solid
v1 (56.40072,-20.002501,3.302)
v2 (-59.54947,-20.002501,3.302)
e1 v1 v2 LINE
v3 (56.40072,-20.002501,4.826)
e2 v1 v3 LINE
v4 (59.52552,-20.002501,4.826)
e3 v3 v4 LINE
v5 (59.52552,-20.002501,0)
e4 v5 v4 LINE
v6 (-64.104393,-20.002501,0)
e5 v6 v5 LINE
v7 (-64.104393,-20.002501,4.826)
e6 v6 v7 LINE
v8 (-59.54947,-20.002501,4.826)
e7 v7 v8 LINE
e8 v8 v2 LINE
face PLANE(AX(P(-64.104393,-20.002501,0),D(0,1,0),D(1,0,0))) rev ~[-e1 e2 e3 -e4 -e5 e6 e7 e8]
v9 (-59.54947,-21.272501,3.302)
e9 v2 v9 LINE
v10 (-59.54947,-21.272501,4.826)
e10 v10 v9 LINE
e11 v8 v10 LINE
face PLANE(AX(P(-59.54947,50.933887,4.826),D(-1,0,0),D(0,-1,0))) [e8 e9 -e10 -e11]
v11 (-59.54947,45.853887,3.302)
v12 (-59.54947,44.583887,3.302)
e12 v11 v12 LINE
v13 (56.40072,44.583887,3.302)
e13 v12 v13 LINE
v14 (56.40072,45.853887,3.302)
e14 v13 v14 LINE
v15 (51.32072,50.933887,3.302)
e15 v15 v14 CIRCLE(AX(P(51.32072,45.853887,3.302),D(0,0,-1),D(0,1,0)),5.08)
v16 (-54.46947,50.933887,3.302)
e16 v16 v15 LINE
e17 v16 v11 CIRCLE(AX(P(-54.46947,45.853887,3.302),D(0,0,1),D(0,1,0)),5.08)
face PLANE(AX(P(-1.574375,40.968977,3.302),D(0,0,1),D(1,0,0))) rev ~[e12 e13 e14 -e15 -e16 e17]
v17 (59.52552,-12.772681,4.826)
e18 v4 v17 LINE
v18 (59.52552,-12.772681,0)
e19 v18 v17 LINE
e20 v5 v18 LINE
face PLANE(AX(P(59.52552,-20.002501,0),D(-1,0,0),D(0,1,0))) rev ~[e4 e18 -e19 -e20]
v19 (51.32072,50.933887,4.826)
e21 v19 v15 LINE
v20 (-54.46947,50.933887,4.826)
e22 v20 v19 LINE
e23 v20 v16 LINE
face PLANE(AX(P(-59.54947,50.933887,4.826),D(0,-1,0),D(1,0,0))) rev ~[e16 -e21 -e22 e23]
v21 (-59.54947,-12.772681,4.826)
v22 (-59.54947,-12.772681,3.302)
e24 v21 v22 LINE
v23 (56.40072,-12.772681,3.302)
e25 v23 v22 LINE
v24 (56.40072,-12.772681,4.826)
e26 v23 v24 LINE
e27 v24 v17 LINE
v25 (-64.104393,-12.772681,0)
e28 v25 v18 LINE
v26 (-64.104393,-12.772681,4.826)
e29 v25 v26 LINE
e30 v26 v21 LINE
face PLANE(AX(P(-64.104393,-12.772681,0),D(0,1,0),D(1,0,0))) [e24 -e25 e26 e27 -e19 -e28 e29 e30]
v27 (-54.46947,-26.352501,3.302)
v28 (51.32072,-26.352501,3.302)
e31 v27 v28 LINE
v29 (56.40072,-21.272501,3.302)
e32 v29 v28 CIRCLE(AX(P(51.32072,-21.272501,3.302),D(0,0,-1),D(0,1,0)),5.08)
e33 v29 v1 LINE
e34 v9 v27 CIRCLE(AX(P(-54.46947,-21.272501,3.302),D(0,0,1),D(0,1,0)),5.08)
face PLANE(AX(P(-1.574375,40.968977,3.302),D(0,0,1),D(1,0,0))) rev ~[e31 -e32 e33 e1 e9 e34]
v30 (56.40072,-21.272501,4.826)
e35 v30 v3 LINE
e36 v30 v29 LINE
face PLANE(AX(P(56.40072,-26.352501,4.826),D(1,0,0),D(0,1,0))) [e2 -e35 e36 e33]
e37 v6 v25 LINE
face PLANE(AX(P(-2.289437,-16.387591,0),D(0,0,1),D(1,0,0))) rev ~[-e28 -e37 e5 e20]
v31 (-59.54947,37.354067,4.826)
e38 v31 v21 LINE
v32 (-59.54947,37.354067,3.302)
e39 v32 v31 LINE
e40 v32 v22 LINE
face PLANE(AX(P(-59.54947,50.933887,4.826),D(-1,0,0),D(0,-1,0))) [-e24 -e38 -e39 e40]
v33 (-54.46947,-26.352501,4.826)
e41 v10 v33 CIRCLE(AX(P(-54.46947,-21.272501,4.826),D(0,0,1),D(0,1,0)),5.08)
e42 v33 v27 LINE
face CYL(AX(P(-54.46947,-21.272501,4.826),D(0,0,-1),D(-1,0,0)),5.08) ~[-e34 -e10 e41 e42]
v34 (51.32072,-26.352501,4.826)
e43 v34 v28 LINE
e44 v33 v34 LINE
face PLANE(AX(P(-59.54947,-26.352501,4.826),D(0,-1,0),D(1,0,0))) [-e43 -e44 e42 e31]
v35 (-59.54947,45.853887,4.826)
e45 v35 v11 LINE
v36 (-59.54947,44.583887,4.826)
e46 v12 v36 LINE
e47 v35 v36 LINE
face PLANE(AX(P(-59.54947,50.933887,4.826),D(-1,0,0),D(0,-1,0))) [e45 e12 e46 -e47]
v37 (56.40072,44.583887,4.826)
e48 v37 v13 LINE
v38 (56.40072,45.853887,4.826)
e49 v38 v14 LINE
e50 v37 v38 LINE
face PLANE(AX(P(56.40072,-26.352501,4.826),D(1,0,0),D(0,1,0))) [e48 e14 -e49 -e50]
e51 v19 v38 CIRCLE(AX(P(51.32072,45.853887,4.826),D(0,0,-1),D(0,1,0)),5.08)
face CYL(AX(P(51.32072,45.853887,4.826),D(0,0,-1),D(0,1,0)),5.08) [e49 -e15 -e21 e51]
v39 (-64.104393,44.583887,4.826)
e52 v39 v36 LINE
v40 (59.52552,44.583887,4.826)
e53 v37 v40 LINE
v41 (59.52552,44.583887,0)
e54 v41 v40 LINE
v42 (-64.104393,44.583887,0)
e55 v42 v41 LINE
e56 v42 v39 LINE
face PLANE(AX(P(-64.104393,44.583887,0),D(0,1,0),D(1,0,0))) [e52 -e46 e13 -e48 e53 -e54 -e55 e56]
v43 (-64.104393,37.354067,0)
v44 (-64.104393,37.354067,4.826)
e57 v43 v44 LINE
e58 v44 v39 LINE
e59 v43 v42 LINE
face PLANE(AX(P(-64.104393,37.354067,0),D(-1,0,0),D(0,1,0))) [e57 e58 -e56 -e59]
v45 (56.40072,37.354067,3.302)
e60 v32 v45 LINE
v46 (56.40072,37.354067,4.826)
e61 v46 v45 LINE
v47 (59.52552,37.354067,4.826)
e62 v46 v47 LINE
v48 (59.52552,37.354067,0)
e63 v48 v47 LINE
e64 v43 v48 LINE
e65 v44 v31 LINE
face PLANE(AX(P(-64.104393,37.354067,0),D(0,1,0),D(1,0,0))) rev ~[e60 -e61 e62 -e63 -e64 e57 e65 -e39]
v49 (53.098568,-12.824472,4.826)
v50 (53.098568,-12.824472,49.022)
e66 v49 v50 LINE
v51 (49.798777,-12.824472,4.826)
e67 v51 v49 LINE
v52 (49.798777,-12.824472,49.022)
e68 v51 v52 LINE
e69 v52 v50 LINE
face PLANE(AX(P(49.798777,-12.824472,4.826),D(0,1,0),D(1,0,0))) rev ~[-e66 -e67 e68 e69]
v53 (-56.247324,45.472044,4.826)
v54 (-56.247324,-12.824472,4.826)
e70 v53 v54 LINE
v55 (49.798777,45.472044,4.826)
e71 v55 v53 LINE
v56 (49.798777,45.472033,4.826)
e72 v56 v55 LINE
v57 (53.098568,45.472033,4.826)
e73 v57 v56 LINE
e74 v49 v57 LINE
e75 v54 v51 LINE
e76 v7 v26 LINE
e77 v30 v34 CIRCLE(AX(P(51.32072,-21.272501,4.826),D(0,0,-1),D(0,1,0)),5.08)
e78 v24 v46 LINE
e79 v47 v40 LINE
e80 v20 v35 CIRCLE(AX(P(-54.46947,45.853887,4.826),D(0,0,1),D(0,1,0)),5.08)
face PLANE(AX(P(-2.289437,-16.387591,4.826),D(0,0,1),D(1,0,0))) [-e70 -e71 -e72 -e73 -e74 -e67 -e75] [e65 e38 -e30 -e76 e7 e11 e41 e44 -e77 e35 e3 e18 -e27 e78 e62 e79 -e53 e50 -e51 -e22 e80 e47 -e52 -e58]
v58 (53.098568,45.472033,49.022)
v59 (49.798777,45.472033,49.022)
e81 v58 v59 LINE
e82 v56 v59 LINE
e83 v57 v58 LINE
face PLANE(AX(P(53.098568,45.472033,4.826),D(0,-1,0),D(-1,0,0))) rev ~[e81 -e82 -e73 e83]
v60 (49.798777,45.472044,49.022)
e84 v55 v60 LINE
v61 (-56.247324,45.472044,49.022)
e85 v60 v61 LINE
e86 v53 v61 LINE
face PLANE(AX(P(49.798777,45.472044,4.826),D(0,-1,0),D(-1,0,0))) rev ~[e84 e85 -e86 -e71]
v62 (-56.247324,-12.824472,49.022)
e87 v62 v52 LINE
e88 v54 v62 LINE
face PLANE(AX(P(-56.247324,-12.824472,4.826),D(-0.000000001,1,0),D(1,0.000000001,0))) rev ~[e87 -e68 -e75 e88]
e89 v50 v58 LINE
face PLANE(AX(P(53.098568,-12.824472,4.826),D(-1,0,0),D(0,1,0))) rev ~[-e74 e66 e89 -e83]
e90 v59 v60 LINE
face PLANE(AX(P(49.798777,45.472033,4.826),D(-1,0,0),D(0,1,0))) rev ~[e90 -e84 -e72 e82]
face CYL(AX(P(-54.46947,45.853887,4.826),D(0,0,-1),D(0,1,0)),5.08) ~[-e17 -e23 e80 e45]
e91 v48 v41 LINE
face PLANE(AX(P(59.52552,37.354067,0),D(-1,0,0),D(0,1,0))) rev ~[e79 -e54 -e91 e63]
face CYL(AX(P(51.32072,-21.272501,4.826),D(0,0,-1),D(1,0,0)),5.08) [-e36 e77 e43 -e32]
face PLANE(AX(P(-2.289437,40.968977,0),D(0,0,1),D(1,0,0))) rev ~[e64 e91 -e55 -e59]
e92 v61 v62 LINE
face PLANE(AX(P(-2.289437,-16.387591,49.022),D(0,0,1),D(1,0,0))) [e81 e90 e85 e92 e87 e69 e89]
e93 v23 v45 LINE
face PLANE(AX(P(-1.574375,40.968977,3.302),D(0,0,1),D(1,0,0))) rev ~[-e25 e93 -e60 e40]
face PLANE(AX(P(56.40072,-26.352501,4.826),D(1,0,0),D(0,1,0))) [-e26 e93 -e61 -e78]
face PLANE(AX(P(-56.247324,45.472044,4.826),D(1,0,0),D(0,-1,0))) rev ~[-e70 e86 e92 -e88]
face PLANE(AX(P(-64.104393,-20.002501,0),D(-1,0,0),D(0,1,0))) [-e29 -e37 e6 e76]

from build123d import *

# Parameters (mm, degrees)
F0_W     = 123.629912734
F0_H     = 7.2298198938
F1_DEPTH = 4.826
F2_W     = 115.9501895308
F2_H     = 7.2298198938
F2_H_2   = 6.35
F2_H_3   = 63.7065680534
F3_DEPTH = 1.524
F5_R     = 5.08
F6_W     = 102.7462986398
F6_H     = 3.4007430077
F6_H_2   = 3.4007552
F7_DEPTH = 44.196
F8_DEPTH = 44.196


# Not quite as in the source:
# - ends of sketch curves that miss each other by under 0.0002 mm in the source are joined


with BuildPart() as f1:
    # F0 (on Top) → F1 (new body)
    with BuildSketch(Plane.XY):
        with Locations((-2.2894367576, -16.3875911385)):
            Rectangle(F0_W, F0_H)
    extrude(amount=F1_DEPTH)


with BuildPart() as f1b:
    # F0 (on Top) → F1, piece 2 (new body)
    with BuildSketch(Plane.XY):
        with Locations((-2.2894367576, 40.9689769149)):
            Rectangle(F0_W, F0_H)
    extrude(amount=F1_DEPTH)


with BuildPart() as f3:
    # F2 (on face) → F3 (new body)
    with BuildSketch(Plane.XY.offset(4.826)):
        with Locations((-1.5743747354, 40.9689769149)):
            Rectangle(F2_W, F2_H)
        with Locations((-1.5743747354, 47.7588868618)):
            Rectangle(F2_W, F2_H_2)
        with Locations((-1.5743747354, 5.5007829413)):
            Rectangle(F2_W, F2_H_3)
    extrude(amount=-F3_DEPTH)


with BuildPart() as f1b_1:
    add(f1b.part)

    # F4: union F3, F1
    add(f3.part)
    add(f1.part)

    # F5
    f5_edges = [f1b_1.edges().sort_by_distance(p)[0] for p in [
        (-59.54947, -26.352501, 4.064),
        (56.40072, -26.352501, 4.064),
        (56.40072, 50.933887, 4.064),
        (-59.54947, 50.933887, 4.064),
    ]]
    fillet(f5_edges, radius=F5_R)

    # F6 (on face) → F7 (join)
    with BuildSketch(Plane.XY.offset(4.826)):
        Polygon((-52.9475212097, 45.4720444977), (-56.2473237514, 45.4720444977), (-56.2473237514, -12.8244720399), (-52.9475212097, -12.8244720399), (-52.9475212097, -9.4237168399), (-52.9475212097, 42.0713014901), align=None)
        with Locations((-1.5743718898, 43.7716729939)):
            Rectangle(F6_W, F6_H)
        Polygon((53.0985676301, 45.4720334084), (49.7987774301, 45.4720334084), (49.7987774301, 42.0713014901), (49.7987774301, -9.4237168399), (49.7987774301, -12.8244717916), (53.0985676301, -12.8244717916), align=None)
        with Locations((-1.5743718898, -11.1240944399)):
            Rectangle(F6_W, F6_H_2)
    extrude(amount=F7_DEPTH)

    # F8 (add): a face of the model
    f8_faces = [f1b_1.faces().sort_by_distance(p)[0] for p in [
        (-1.5743718898, 16.3237923251, 4.826),
    ]]
    extrude(f8_faces, amount=F8_DEPTH)


solid = f1b_1.part
